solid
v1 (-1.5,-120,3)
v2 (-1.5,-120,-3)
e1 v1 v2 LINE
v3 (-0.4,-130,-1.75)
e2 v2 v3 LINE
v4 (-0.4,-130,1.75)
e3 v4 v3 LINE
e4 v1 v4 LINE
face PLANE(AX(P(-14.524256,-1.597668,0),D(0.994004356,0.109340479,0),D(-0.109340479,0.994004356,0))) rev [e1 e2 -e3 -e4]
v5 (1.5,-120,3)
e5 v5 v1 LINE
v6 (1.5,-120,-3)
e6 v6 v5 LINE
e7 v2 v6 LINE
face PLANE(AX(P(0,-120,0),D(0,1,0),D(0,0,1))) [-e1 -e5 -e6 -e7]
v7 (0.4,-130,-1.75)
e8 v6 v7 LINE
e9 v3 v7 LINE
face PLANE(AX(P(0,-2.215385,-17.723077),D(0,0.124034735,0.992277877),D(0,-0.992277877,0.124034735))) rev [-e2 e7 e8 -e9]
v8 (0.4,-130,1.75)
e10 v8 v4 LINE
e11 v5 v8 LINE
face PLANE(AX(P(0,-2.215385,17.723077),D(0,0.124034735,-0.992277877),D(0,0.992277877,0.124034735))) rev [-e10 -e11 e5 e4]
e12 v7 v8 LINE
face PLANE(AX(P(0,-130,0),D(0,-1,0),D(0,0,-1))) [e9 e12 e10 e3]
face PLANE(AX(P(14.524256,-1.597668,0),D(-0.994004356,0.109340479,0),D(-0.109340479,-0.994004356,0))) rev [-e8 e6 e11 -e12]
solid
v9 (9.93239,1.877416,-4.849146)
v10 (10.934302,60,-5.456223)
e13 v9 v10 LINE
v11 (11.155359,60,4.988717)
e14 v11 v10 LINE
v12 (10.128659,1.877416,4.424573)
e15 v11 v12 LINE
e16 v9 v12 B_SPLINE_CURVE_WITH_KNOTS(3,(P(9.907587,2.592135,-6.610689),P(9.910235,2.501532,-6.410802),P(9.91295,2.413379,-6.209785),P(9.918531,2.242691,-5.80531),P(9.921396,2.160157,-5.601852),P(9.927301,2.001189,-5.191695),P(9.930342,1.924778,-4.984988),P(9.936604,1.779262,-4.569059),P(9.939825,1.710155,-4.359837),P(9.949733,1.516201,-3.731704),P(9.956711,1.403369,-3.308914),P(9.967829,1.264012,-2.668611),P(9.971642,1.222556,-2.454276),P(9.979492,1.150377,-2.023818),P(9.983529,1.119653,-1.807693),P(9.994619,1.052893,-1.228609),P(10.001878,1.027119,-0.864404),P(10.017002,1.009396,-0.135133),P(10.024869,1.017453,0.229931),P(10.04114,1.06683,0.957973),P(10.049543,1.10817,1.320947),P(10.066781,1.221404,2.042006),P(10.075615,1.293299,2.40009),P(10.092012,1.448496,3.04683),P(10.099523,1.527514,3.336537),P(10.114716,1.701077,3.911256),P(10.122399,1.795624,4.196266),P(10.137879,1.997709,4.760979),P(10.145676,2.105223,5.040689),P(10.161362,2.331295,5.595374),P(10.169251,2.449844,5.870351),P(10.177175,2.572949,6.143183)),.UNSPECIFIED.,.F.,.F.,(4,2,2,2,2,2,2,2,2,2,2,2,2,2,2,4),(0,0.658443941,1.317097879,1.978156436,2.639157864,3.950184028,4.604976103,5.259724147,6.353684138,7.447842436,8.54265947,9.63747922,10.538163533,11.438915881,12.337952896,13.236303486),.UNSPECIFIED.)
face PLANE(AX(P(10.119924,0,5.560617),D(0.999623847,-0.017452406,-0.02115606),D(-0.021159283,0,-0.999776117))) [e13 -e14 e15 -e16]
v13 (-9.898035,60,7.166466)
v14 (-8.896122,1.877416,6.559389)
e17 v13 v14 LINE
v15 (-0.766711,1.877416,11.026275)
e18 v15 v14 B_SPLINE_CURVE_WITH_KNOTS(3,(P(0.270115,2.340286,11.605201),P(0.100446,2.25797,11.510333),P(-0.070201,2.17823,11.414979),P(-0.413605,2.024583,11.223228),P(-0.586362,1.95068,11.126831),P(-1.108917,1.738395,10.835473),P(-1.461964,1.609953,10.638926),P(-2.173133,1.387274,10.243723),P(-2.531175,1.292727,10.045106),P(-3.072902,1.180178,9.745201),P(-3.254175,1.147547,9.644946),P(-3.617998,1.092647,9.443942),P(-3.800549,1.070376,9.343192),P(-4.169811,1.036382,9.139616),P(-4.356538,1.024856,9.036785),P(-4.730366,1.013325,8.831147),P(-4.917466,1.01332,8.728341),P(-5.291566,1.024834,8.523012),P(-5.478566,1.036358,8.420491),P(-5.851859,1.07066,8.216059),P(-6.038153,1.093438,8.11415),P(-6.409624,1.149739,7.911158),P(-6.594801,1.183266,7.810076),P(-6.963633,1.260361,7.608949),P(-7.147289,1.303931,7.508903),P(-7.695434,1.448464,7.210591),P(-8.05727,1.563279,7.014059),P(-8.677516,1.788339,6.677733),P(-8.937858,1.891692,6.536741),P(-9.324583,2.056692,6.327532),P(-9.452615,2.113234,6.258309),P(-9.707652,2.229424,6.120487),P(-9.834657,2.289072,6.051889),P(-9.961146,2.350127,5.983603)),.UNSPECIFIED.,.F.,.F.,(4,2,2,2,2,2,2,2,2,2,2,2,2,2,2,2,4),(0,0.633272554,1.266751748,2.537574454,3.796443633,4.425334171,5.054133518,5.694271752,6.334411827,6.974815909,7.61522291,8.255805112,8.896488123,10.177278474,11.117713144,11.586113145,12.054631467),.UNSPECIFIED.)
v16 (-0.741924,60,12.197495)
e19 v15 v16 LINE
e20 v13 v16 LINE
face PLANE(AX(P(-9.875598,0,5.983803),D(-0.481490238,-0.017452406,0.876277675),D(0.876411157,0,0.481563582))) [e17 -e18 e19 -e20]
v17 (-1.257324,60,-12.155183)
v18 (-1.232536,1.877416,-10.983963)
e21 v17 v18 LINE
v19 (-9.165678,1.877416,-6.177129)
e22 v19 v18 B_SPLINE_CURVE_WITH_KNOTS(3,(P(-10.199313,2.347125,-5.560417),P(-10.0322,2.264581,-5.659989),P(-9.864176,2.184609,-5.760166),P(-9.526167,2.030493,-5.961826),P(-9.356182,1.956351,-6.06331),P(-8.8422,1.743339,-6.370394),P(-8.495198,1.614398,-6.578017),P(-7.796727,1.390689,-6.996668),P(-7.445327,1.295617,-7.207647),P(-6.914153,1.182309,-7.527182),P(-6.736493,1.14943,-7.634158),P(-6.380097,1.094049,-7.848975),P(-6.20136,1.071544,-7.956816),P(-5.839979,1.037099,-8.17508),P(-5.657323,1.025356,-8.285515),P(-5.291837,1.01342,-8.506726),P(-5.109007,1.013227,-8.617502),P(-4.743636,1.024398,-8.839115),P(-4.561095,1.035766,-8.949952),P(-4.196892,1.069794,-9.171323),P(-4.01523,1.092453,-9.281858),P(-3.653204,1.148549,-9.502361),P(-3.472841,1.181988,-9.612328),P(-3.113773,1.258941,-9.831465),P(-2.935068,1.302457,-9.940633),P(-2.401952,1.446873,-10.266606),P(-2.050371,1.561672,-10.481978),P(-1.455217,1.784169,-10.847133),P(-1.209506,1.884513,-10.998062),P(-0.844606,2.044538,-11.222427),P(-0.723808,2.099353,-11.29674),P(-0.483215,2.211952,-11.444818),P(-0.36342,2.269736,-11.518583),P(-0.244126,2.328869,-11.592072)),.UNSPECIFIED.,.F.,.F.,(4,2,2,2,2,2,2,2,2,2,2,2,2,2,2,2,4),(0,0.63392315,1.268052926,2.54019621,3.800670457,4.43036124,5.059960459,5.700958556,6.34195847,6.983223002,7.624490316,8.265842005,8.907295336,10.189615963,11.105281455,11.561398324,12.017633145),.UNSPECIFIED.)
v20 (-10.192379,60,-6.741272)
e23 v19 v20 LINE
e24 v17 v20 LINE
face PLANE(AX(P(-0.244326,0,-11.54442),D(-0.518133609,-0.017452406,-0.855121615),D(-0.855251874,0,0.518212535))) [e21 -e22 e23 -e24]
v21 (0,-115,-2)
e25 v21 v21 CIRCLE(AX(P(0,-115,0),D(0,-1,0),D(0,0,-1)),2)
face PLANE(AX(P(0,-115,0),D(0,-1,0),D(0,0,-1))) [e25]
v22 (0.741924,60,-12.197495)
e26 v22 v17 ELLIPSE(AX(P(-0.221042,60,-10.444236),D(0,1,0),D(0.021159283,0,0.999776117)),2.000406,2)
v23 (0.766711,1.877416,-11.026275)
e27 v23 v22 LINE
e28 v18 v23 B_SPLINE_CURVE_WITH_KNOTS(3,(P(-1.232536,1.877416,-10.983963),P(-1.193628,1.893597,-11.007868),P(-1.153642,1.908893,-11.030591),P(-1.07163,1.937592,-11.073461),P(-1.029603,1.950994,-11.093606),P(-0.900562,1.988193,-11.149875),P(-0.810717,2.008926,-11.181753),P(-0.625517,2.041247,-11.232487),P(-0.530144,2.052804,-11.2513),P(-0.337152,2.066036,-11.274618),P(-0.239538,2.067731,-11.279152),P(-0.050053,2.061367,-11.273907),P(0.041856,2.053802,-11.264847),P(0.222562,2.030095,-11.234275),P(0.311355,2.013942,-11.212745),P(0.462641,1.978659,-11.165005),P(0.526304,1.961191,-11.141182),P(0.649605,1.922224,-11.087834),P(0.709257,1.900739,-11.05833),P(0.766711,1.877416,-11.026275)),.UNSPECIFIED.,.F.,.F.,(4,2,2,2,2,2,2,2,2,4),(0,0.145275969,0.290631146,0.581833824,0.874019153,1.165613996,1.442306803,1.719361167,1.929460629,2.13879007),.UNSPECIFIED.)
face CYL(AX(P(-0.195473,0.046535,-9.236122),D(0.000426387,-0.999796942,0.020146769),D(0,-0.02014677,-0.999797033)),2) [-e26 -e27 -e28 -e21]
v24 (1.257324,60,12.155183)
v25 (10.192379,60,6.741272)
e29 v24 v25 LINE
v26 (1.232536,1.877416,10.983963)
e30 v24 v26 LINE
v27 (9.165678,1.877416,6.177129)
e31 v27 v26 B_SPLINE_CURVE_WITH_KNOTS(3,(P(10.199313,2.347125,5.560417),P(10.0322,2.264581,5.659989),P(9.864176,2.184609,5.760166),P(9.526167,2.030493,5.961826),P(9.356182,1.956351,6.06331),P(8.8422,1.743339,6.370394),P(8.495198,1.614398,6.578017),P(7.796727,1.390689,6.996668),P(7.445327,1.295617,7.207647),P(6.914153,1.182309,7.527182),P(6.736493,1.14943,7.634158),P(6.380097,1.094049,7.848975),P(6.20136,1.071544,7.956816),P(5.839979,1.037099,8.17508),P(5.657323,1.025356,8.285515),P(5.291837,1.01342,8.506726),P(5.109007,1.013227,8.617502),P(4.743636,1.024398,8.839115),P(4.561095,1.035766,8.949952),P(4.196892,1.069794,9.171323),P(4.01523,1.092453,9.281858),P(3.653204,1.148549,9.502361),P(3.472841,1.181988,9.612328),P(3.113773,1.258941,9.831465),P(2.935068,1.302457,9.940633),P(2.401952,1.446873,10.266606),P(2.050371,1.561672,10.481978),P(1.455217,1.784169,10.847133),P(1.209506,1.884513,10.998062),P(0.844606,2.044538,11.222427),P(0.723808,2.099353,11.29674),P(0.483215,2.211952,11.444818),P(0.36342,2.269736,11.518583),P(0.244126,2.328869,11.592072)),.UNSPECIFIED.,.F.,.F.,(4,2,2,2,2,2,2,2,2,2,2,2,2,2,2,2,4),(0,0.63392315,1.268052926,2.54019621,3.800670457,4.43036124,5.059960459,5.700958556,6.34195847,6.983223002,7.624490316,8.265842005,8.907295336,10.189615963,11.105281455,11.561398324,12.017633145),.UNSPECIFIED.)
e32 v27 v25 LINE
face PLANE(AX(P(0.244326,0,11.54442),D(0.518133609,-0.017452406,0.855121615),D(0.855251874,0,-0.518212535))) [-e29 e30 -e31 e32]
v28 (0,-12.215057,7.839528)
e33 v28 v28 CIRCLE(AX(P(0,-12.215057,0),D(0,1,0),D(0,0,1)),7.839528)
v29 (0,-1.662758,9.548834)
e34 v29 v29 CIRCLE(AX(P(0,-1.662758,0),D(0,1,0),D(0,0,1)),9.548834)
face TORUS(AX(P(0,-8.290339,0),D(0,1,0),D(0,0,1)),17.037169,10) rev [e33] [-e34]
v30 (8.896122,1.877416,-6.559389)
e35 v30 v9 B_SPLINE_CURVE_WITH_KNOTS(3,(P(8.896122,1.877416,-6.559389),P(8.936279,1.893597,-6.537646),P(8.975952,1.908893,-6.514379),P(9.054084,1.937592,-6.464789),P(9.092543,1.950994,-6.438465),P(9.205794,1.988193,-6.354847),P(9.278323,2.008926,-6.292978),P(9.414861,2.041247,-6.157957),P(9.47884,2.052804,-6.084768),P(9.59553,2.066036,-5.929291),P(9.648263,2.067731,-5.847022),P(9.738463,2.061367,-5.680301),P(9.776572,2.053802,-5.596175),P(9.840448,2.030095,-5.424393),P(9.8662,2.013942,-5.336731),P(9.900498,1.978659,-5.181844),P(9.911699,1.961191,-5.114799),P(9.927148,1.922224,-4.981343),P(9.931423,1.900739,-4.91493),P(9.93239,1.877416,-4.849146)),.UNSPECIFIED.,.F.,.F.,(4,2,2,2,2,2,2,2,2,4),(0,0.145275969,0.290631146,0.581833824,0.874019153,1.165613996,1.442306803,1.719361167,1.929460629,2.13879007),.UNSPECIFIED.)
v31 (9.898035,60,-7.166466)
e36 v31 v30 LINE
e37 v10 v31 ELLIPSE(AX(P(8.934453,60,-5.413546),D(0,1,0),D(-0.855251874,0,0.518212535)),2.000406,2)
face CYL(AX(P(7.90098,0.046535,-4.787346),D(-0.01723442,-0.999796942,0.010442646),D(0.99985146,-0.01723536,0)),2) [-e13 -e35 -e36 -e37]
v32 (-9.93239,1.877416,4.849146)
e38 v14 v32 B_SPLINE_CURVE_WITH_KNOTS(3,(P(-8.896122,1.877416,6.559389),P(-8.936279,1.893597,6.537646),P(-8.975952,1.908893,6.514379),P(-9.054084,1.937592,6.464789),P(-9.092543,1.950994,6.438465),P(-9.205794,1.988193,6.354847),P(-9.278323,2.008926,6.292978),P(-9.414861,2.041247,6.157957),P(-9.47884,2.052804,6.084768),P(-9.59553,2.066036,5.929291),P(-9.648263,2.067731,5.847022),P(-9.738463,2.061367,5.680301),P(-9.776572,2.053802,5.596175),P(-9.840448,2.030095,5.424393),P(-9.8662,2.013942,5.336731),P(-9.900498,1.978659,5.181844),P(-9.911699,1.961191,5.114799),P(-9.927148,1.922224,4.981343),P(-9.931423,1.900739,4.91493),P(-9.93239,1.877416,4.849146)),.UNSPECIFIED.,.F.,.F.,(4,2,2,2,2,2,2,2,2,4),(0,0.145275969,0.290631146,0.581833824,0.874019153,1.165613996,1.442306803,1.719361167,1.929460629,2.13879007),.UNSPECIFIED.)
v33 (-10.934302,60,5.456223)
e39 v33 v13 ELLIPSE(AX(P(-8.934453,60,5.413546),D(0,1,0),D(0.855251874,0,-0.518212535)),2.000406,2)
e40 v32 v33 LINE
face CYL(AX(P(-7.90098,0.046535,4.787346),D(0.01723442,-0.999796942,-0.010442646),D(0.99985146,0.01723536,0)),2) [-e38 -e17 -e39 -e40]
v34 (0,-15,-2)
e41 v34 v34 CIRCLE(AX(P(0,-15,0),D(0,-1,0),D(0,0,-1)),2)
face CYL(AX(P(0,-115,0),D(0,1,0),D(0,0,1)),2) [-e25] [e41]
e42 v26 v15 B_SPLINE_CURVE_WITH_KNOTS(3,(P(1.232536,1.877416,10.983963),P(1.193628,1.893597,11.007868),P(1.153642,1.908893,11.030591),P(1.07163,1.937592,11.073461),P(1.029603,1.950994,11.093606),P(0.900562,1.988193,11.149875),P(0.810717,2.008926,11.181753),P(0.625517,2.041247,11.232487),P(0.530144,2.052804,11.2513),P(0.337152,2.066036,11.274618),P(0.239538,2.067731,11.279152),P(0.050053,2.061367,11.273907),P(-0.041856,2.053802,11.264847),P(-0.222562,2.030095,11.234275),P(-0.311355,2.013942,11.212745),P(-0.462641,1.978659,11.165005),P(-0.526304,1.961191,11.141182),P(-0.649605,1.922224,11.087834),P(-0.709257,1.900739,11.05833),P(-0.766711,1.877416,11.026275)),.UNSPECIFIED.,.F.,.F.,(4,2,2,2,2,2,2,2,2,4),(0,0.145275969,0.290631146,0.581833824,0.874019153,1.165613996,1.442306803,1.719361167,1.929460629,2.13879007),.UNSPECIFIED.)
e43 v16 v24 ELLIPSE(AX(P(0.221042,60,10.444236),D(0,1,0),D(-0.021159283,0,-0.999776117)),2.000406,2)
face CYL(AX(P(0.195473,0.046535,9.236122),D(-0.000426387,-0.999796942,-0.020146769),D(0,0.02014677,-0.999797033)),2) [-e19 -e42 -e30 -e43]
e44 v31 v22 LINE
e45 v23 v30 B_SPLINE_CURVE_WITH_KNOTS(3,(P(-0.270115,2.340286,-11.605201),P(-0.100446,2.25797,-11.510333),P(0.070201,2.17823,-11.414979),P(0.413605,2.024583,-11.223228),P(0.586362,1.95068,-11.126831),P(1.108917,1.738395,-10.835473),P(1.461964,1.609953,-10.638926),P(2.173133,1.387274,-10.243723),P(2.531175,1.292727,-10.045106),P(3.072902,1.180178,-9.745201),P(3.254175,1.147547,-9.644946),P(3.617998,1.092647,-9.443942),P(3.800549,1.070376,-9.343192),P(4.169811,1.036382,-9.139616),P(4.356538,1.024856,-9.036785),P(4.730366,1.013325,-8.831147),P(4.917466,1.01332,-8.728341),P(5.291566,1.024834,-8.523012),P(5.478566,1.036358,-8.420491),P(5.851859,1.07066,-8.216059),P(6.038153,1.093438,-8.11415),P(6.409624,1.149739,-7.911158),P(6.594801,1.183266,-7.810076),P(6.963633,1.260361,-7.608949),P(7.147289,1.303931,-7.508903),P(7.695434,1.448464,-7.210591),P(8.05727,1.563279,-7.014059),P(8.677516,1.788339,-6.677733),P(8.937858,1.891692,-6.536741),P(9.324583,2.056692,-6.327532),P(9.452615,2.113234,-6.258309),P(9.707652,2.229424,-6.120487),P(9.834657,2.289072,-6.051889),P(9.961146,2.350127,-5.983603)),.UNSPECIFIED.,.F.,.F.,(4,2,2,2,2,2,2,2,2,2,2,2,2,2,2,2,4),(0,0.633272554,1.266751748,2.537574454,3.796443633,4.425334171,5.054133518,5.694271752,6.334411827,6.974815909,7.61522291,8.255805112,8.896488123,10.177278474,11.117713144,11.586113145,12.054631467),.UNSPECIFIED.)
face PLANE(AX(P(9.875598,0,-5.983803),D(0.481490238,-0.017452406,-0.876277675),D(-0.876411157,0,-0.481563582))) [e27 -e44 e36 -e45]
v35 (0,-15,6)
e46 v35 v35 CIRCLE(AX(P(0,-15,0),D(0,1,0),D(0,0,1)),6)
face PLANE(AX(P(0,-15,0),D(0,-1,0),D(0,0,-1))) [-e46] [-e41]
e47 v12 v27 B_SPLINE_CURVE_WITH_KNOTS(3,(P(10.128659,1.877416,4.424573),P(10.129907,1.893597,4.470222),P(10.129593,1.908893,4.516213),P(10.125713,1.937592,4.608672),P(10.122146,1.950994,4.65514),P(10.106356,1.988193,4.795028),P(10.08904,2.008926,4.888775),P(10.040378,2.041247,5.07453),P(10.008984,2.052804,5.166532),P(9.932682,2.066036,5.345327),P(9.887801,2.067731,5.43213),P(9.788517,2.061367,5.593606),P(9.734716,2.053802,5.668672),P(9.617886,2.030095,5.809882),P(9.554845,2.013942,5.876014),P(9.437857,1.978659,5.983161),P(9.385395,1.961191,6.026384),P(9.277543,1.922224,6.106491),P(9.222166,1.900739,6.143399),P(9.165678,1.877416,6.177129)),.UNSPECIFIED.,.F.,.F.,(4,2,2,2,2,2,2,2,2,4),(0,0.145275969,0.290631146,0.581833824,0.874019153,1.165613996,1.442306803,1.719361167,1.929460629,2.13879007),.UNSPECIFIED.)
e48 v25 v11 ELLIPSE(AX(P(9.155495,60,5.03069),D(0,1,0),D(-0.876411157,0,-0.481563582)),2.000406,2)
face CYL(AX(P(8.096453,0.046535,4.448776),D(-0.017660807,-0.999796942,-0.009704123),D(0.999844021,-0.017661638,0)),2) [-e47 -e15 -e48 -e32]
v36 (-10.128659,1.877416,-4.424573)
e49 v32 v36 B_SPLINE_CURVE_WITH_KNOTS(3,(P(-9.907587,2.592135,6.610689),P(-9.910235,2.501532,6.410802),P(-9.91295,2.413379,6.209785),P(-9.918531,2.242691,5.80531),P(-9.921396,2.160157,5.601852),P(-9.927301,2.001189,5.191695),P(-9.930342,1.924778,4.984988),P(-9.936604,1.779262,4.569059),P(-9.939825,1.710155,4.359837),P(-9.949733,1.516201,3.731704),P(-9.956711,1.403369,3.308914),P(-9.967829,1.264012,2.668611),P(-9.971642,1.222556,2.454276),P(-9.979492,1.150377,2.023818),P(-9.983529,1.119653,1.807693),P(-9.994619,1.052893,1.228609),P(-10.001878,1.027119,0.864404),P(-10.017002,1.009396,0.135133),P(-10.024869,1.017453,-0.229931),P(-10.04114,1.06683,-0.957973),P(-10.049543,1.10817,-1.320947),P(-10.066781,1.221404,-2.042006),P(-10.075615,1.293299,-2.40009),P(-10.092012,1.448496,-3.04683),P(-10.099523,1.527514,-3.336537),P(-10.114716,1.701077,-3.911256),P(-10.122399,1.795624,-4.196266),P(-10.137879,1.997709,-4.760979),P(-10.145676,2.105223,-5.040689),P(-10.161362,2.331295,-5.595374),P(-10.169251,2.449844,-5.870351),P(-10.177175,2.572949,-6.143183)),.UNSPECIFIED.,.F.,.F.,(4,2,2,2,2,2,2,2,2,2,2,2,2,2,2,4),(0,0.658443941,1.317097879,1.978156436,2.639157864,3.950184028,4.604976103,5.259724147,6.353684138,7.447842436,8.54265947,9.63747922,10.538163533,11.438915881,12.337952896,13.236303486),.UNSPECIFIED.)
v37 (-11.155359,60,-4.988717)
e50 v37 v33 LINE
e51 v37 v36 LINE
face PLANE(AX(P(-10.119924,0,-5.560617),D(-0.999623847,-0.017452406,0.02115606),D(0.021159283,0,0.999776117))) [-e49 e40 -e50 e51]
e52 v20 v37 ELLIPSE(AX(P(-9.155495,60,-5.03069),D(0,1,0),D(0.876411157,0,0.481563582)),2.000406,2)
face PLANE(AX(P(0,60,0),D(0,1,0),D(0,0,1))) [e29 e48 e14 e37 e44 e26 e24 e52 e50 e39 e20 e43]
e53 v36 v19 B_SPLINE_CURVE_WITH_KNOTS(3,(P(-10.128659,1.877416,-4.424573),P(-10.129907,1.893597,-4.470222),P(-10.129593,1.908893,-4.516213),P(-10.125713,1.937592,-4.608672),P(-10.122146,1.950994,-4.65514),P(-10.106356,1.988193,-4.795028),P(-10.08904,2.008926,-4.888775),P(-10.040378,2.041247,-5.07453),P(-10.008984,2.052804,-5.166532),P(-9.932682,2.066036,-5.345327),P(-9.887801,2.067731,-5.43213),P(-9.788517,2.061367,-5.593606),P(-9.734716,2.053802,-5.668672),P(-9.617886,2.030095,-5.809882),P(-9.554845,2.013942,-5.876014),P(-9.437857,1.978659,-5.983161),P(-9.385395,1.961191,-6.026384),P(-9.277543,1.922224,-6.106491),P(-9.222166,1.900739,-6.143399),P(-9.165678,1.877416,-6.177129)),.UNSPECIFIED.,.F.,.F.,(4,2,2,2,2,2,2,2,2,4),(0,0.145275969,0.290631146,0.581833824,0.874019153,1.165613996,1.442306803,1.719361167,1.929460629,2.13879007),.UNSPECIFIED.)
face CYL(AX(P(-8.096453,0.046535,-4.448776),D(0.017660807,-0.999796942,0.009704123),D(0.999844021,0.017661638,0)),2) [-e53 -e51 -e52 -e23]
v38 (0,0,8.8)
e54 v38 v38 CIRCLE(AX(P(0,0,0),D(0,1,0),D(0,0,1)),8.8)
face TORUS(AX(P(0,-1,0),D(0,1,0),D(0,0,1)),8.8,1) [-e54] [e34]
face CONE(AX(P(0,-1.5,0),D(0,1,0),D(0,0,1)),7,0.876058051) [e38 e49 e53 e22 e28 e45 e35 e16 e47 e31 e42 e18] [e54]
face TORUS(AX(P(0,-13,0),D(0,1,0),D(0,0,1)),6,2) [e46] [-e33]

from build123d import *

# Parameters (mm, degrees)
EXTRUDE_1_DEPTH = 60
DRAFT_1_ANGLE   = 1
FILLET_1_R      = 2
SKETCH_4_R      = 2
EXTRUDE_2_DEPTH = 100


# Read off the part's stored shape, not the designer's step: 切除-旋转-薄壁1
with BuildPart() as part:
    # 草图1 → 凸台-拉伸1 (new body)
    with BuildSketch(Plane(origin=(0, 0, 0), x_dir=(1, 0, 0), z_dir=(0, 1, 0))):
        Polygon((0.244326354, -11.544420209), (10.11992435, -5.560617276), (9.875597996, 5.983802934), (-0.244326354, 11.544420209), (-10.11992435, 5.560617276), (-9.875597996, -5.983802934), align=None)
    extrude(amount=EXTRUDE_1_DEPTH)

    # 拔模1
    draft_1_faces = [part.faces().sort_by_distance(p)[0] for p in [
        (-9.997761173, 30, 0.211592829),
        (-4.815635821, 30, 8.764111571),
        (5.182125352, 30, 8.552518742),
        (9.997761173, 30, -0.211592829),
        (4.815635821, 30, -8.764111571),
        (-5.182125352, 30, -8.552518742),
    ]]
    draft(draft_1_faces, Plane(origin=(0, 0, 0), x_dir=(0, 0, -1), z_dir=(0, -1, 0)), DRAFT_1_ANGLE)

    # 切除-旋转-薄壁1 outline → 切除-旋转-薄壁1 (revolve, cut)
    with BuildSketch(Plane.XY):
        Polygon((11.593936647, 2.32828054), (8.8, 0), (11.593936647, 0), align=None)
    revolve(axis=Axis((0, 0, 0), (0, 1, 0)), mode=Mode.SUBTRACT)

    # 圆角1
    fillet_1_edges = [part.edges().sort_by_distance(p)[0] for p in [
        (-0.257617025, 31.164138617, -12.172404417),
        (10.412802938, 31.164138617, -6.309305096),
        (10.670419963, 31.164138617, 5.863099321),
        (-10.670419963, 31.164138617, -5.863099321),
        (0.257617025, 31.164138617, 12.172404417),
        (-10.412802938, 31.164138617, 6.309305096),
    ]]
    fillet(fillet_1_edges, radius=FILLET_1_R)

    # 草图3 → 旋转1 (revolve)
    with BuildSketch(Plane.XY, mode=Mode.PRIVATE) as revolve_1_sk:
        with BuildLine():
            Line((0, -15), (-6, -15))
            ThreePointArc((-6, -15), (-7.668814978, -14.102296044), (-7.839528148, -12.215056568))
            ThreePointArc((-7.839528148, -12.215056568), (-7.165836652, -6.691339771), (-9.548833535, -1.662758128))
            ThreePointArc((-9.548833535, -1.662758128), (-9.711799903, -0.589365204), (-8.8, 0))
            Line((-8.8, 0), (0, 0))
            Line((0, 0), (0, -15))
        make_face()
    revolve(revolve_1_sk.sketch.rotate(Axis((0, 0, 0), (0, -1, 0)), 270), axis=Axis((0, 0, 0), (0, -1, 0)))

    # 草图4 → 凸台-拉伸2 (add)
    with BuildSketch(Plane(origin=(0, -15, 0), x_dir=(-1, 0, 0), z_dir=(0, -1, 0))):
        with Locations(Location((0, 0, 0), (0, 0, 90))):
            Circle(SKETCH_4_R)
    extrude(amount=EXTRUDE_2_DEPTH)


with BuildPart() as body_2:
    # 草图6 → 放样1 section 0
    with BuildSketch(Plane(origin=(0, -120, 0), x_dir=(-1, 0, 0), z_dir=(0, -1, 0))):
        with BuildLine():
            Line((1.5, 3), (-1.5, 3))
            Line((-1.5, 3), (-1.5, -3))
            Line((-1.5, -3), (1.5, -3))
            Line((1.5, -3), (1.5, 3))
        make_face()
    # 草图7 → 放样1 section 1
    with BuildSketch(Plane(origin=(0, -130, 0), x_dir=(-1, 0, 0), z_dir=(0, -1, 0))):
        with BuildLine():
            Line((-0.4, 1.75), (0.4, 1.75))
            Line((0.4, 1.75), (0.4, -1.75))
            Line((0.4, -1.75), (-0.4, -1.75))
            Line((-0.4, -1.75), (-0.4, 1.75))
        make_face()
    loft()


solid = Compound([part.part, body_2.part])
